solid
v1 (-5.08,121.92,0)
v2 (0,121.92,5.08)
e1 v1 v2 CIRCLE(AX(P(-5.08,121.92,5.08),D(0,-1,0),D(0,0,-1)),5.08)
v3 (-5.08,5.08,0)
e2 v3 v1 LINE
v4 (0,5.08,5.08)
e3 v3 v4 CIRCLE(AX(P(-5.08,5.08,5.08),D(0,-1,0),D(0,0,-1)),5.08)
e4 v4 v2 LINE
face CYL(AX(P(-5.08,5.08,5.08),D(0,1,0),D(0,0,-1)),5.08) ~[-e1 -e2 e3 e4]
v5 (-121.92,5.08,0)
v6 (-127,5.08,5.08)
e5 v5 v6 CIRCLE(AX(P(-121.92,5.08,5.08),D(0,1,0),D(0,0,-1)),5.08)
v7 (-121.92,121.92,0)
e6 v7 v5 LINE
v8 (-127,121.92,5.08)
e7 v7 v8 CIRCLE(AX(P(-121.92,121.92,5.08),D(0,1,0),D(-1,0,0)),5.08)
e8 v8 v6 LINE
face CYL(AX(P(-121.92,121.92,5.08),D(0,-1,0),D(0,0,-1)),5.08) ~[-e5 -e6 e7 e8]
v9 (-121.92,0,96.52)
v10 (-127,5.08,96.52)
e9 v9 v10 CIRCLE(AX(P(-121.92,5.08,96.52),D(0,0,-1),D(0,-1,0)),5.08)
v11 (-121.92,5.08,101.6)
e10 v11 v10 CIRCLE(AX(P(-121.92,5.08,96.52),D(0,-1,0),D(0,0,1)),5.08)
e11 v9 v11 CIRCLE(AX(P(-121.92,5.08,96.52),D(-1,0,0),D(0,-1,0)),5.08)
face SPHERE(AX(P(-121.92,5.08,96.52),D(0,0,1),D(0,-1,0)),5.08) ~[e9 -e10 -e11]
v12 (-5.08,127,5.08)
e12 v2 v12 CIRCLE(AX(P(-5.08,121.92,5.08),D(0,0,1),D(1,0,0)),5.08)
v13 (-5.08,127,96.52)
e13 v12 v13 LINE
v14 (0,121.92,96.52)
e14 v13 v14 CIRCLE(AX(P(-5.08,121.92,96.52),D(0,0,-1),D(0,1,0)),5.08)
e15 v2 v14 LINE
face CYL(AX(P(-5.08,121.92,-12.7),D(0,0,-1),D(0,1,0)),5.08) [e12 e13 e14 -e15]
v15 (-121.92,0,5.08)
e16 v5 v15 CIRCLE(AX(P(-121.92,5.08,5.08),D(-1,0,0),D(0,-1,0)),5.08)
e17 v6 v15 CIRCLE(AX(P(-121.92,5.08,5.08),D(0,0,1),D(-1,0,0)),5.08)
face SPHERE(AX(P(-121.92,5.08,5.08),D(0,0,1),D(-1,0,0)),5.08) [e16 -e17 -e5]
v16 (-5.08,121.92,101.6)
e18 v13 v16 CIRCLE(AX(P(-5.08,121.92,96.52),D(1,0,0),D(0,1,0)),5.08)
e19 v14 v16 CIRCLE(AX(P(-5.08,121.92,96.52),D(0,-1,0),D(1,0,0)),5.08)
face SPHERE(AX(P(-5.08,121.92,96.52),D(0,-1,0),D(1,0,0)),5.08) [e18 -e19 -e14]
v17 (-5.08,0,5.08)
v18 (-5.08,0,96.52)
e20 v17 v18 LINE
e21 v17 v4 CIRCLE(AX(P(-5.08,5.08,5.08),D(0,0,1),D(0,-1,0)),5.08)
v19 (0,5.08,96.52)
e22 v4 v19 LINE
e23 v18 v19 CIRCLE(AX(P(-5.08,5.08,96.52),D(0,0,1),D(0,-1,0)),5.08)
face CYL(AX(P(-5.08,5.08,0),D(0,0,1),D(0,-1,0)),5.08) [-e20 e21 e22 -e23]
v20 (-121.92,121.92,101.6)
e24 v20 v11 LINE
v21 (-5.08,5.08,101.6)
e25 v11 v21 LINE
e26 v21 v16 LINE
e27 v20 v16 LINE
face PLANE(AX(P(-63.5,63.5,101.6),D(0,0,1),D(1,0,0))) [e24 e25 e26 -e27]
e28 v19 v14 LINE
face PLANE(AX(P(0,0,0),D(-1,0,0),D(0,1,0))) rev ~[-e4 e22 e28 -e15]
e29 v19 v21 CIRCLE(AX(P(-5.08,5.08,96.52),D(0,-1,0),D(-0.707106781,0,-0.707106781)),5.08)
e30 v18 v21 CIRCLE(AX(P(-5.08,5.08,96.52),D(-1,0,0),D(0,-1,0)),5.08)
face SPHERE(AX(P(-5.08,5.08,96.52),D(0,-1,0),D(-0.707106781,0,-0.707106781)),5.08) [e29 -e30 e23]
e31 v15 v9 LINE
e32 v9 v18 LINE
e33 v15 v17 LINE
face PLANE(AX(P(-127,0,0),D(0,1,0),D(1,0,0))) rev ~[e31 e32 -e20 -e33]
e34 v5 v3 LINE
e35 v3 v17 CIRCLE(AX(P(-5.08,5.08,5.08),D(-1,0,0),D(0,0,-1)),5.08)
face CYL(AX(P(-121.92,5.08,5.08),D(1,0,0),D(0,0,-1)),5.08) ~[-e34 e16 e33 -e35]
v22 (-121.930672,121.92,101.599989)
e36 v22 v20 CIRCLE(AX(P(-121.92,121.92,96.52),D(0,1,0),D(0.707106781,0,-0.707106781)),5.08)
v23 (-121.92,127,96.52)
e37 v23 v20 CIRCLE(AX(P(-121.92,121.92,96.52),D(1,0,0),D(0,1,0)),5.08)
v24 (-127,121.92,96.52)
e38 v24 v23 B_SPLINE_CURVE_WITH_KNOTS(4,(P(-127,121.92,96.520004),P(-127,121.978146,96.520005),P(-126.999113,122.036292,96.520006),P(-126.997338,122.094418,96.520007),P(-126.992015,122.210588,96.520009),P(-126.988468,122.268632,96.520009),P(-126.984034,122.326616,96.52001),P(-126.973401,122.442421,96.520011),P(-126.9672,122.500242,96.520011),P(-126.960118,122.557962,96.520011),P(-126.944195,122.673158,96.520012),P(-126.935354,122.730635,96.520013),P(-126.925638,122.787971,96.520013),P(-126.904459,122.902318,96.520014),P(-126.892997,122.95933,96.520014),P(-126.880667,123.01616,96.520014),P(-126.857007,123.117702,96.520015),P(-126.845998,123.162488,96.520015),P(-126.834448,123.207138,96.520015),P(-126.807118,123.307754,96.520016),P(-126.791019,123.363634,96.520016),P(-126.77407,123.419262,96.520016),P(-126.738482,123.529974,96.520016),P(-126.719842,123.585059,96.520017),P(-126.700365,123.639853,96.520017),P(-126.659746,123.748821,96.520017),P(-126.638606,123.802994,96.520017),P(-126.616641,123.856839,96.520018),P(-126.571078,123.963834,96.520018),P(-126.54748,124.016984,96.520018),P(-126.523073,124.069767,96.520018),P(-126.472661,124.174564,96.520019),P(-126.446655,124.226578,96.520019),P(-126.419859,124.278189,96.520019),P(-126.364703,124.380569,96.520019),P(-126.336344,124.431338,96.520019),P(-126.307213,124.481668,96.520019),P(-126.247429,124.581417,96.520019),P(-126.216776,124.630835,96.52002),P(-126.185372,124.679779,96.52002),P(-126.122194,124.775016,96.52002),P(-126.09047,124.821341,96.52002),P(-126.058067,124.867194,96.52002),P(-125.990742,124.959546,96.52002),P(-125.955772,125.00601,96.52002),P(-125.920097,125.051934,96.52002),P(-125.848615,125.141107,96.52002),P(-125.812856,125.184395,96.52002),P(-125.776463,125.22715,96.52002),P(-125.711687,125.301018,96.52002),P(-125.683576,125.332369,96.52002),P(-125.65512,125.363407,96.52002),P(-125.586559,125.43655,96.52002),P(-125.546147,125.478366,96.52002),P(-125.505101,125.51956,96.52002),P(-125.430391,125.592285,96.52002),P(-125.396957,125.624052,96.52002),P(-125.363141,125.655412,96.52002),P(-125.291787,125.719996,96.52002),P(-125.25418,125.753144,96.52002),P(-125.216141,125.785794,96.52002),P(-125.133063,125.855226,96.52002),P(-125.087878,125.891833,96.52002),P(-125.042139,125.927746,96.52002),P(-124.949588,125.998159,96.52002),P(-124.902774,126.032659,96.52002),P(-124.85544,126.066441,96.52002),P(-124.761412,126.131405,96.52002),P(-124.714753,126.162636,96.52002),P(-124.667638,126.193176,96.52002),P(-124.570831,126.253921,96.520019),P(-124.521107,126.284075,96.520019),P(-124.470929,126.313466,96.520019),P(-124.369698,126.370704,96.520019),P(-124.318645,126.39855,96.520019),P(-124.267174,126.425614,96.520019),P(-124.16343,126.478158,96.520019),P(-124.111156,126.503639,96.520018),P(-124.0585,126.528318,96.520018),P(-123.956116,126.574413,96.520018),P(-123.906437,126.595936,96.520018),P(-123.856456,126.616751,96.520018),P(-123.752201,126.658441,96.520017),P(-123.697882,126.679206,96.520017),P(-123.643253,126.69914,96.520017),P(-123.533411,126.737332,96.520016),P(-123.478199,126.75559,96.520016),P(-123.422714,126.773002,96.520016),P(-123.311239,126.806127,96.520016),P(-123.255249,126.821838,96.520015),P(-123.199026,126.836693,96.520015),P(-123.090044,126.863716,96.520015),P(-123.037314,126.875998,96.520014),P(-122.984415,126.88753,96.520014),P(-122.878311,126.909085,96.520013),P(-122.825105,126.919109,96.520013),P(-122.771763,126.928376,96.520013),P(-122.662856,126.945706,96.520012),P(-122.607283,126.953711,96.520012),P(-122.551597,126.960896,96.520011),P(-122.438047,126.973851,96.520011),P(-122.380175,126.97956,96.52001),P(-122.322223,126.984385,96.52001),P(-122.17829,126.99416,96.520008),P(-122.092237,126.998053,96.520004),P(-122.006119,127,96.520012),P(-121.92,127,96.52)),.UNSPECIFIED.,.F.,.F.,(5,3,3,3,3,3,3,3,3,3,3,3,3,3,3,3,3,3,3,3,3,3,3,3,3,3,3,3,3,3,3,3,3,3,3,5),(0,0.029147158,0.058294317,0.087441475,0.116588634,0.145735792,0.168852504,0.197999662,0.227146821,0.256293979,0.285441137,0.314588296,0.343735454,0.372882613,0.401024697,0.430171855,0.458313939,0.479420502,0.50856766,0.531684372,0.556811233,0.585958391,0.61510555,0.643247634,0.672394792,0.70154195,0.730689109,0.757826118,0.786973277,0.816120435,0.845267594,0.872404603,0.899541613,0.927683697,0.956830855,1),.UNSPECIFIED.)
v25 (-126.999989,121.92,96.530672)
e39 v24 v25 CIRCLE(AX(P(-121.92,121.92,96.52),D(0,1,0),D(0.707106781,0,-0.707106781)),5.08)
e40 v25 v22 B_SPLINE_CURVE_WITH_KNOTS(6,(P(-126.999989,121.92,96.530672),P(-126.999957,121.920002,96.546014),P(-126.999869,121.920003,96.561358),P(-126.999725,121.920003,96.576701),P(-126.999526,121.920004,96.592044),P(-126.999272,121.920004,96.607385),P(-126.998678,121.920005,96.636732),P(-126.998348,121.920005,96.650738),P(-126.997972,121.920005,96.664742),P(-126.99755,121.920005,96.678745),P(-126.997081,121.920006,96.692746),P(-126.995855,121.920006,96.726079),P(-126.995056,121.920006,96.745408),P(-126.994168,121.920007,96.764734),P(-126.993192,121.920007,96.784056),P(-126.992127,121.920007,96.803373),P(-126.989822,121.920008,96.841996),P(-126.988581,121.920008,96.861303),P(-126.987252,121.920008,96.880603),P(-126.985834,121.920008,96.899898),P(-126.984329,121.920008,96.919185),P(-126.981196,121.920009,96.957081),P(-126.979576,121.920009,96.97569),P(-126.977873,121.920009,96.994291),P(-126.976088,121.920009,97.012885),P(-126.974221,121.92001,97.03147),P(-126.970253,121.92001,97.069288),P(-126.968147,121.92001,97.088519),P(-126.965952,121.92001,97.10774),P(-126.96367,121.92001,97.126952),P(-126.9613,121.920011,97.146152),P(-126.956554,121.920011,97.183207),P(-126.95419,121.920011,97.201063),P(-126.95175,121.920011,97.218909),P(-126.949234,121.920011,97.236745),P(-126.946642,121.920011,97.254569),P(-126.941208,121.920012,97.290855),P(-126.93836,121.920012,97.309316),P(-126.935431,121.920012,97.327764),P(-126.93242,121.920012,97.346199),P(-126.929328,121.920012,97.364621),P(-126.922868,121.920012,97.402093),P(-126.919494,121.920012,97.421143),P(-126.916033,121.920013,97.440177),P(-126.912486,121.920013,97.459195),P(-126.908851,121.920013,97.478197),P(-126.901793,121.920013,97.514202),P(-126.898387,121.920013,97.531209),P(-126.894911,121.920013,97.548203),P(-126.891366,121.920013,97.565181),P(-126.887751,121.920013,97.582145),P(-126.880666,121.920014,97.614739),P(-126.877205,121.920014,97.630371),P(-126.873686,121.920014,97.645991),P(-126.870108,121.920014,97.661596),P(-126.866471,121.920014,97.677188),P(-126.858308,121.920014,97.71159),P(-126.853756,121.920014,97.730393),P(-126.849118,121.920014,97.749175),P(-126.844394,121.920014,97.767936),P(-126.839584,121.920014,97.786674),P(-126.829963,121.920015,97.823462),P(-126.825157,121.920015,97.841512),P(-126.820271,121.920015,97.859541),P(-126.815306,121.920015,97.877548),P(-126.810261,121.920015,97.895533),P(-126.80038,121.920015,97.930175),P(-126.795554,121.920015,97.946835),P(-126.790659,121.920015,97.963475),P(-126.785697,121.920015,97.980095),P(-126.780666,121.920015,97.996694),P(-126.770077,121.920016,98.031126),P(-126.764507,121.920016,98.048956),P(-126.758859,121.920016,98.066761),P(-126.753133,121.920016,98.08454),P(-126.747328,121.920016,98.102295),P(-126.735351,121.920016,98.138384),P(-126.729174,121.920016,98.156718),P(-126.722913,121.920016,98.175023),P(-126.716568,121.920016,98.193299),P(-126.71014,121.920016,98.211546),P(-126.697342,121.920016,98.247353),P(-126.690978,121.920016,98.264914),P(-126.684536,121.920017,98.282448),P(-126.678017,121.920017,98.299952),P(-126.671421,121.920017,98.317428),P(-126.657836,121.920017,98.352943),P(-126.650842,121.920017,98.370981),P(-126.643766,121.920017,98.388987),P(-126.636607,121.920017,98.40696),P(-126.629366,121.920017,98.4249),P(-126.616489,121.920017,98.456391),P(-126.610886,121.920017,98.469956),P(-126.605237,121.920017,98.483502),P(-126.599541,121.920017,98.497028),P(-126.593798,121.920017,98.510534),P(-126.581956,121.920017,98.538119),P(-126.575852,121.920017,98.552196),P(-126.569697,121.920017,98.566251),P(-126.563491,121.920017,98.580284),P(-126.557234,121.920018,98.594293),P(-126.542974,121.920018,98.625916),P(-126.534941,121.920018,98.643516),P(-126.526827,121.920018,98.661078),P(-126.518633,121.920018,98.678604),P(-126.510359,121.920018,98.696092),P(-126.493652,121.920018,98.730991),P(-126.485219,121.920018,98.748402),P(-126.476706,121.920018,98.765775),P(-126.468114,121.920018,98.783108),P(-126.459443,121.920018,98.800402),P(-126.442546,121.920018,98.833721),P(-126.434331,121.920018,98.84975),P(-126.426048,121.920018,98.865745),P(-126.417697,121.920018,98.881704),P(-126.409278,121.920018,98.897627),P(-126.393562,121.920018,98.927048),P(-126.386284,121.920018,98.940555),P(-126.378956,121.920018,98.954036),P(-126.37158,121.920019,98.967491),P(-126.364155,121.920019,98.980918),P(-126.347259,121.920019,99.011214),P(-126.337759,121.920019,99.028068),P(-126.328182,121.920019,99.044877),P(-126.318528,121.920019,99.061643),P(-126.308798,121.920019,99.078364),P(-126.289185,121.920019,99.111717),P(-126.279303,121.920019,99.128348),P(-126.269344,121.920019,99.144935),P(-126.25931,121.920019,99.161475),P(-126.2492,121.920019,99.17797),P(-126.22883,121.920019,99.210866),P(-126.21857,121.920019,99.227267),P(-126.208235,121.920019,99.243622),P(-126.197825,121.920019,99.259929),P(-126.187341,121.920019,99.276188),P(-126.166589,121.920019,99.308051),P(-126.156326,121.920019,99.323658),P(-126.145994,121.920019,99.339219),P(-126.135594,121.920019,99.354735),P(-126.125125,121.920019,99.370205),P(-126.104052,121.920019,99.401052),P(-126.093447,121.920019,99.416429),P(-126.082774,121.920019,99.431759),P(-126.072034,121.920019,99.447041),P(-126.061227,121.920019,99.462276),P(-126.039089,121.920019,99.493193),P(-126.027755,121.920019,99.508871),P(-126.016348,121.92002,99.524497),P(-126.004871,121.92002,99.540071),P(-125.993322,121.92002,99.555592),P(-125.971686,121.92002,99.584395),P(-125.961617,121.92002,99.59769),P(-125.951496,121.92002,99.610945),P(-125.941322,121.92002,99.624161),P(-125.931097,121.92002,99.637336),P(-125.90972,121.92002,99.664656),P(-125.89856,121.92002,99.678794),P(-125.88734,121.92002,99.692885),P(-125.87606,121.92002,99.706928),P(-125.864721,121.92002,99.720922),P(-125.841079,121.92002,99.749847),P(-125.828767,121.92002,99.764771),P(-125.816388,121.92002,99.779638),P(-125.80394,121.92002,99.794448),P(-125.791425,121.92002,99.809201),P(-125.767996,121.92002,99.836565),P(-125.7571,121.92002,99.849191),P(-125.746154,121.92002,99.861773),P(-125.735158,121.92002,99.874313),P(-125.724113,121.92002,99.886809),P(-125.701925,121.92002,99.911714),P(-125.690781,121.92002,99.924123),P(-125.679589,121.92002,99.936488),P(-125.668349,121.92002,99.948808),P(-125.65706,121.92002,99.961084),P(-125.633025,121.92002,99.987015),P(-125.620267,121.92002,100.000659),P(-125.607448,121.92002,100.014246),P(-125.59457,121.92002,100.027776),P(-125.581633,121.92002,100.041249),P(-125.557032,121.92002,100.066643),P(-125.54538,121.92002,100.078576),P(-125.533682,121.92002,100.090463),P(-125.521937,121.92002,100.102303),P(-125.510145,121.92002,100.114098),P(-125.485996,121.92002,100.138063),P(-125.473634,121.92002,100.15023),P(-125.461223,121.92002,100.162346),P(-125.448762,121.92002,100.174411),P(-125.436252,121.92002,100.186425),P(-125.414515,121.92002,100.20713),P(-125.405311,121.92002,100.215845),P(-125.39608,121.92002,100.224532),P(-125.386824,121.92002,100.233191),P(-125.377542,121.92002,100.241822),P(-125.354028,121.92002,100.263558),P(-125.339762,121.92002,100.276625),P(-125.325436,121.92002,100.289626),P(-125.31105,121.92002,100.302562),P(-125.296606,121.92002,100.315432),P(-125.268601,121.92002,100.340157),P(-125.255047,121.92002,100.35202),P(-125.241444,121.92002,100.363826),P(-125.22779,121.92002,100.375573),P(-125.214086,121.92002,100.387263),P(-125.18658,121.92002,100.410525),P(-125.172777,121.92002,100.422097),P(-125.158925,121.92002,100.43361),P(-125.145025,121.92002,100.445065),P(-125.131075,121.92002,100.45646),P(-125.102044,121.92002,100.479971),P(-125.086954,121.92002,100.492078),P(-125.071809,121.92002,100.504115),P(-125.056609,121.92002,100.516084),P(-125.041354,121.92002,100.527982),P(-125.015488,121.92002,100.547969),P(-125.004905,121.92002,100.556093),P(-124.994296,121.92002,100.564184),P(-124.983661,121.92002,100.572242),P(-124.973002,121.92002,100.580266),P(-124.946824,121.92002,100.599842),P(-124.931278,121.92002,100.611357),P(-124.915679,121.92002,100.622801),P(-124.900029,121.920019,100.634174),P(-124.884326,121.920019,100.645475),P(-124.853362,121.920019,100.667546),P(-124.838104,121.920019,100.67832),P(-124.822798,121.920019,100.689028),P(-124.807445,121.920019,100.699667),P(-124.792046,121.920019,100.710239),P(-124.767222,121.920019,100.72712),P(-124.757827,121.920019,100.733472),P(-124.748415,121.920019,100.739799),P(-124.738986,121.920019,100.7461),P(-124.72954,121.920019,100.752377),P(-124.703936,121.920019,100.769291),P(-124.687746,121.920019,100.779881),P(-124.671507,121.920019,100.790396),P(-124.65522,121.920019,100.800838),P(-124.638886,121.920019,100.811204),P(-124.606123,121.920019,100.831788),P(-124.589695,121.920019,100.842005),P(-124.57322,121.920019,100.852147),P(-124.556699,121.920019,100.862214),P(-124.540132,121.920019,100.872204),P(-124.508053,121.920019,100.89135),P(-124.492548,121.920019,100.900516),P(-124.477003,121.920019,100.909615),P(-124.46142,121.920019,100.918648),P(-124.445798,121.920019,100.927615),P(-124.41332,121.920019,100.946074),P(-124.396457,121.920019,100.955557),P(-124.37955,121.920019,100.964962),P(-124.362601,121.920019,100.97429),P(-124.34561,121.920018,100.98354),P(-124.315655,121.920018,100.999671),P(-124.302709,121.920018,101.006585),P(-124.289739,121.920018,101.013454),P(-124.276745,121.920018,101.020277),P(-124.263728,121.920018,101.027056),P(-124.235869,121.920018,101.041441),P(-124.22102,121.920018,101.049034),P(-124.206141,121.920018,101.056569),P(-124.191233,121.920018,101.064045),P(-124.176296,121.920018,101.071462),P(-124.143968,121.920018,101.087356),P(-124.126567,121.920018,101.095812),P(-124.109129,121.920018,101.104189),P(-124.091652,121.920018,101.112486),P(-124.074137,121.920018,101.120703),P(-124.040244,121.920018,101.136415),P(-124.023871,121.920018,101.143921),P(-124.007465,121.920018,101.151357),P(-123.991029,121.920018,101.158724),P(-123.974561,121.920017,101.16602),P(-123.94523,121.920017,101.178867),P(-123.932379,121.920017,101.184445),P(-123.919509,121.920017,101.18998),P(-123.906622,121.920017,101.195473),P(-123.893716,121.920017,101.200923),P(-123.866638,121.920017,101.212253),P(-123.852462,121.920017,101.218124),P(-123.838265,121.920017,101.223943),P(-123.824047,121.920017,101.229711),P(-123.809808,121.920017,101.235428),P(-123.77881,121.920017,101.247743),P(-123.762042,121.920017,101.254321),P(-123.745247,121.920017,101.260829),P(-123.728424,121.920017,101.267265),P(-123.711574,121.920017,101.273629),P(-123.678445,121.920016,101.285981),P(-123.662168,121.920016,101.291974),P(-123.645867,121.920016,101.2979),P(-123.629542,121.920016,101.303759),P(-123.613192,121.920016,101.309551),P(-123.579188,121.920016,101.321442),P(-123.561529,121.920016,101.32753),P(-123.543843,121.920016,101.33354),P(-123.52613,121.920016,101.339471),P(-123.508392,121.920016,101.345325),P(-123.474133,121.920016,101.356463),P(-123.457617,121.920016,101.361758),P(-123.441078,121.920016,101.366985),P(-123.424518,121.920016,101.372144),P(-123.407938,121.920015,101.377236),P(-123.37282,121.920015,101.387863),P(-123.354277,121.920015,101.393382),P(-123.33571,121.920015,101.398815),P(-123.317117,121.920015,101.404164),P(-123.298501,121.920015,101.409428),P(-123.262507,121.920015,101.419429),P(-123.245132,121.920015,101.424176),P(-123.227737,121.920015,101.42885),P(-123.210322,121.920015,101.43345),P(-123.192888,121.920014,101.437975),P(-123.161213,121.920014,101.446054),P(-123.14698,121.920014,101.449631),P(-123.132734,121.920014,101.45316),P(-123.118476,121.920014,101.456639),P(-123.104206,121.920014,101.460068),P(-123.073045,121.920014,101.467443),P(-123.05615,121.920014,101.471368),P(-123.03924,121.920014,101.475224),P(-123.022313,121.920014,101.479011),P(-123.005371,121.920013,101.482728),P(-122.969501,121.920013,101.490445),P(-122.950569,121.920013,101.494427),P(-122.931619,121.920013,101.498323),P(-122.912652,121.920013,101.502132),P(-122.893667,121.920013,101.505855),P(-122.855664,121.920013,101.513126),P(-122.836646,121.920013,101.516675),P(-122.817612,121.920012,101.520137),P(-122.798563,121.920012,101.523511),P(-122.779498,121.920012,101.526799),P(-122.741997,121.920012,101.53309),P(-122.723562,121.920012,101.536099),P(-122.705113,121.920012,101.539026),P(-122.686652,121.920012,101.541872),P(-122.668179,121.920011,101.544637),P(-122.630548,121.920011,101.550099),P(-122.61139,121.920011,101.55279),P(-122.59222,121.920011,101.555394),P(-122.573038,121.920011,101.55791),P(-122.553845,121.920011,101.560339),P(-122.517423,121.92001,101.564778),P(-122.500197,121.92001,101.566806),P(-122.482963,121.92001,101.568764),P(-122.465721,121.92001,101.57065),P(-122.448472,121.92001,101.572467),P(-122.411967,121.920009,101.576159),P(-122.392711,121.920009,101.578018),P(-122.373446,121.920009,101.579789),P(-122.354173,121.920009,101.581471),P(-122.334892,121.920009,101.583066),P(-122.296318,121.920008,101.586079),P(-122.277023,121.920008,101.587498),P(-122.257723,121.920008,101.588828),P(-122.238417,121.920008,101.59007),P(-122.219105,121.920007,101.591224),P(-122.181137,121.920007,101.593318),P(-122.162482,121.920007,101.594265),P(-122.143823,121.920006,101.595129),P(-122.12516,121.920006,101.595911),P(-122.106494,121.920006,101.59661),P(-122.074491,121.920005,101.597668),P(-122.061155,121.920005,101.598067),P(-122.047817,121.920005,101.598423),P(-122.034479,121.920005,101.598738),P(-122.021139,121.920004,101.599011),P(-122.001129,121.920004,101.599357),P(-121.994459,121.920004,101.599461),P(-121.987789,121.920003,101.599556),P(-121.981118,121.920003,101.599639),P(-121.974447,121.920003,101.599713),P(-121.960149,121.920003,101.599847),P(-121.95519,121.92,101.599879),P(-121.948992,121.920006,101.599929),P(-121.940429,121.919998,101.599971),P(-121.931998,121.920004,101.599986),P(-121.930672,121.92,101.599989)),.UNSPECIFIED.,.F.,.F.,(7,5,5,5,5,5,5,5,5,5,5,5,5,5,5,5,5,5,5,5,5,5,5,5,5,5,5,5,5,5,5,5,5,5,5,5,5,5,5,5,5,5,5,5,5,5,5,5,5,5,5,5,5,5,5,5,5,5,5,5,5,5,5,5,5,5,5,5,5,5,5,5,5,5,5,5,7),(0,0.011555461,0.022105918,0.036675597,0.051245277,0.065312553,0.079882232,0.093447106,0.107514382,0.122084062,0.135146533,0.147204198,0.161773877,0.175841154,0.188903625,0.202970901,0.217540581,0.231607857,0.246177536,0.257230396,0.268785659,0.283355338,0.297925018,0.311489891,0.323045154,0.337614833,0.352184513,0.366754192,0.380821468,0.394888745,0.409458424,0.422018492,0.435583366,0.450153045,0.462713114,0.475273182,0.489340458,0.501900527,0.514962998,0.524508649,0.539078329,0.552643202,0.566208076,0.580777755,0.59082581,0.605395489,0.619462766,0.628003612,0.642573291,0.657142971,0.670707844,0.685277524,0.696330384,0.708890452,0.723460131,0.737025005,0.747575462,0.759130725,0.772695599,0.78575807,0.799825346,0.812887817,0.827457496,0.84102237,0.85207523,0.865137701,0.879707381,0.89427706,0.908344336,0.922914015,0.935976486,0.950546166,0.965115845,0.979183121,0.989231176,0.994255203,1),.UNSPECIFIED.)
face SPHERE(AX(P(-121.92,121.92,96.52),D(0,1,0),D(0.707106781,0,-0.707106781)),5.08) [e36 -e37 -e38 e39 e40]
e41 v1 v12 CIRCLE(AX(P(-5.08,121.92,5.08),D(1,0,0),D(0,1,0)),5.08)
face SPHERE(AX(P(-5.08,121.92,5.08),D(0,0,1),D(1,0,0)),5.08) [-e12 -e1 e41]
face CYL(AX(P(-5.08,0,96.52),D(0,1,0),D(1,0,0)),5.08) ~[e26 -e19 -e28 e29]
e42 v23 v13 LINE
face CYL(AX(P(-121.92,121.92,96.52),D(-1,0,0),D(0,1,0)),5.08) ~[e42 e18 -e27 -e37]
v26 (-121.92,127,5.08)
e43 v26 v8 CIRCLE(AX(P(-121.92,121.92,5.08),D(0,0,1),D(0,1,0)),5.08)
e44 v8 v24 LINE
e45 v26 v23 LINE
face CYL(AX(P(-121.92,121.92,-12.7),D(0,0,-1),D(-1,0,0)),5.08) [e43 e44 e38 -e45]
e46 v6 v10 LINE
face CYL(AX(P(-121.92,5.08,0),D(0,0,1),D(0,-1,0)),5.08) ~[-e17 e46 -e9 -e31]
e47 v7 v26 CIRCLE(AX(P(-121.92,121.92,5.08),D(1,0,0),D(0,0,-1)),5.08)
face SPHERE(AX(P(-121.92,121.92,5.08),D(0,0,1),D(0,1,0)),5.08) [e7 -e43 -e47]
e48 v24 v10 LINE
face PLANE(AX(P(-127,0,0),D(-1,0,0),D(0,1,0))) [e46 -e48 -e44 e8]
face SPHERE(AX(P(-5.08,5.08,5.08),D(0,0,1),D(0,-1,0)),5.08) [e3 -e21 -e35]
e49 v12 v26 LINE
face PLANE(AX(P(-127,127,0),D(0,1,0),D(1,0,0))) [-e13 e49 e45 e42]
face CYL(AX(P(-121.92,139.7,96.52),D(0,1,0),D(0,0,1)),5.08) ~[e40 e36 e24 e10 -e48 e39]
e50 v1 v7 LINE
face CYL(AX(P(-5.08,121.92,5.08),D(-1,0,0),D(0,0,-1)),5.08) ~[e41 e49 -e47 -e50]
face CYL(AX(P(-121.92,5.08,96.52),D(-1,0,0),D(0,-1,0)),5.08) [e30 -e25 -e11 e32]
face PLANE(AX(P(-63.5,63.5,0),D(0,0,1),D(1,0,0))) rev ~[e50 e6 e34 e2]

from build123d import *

# Parameters (mm, degrees)
F0_W         = 127
F0_H         = 127
F1_DEPTH     = 101.6
F2_R         = 5.08
F3_R         = 5.08
F4_T1_DEPTH  = 134.62
F4_T3_DEPTH  = 127
F4_T5_DEPTH  = 116.84
F4_S9_W      = 5.08
F4_S9_H      = 5.08
F4_T10_DEPTH = 5.08
F4_T14_ANGLE = 90
F5_T1_DEPTH  = 116.84
F5_T3_DEPTH  = 109.22
F5_S7_W      = 5.08
F5_S7_H      = 5.08
F5_T8_DEPTH  = 5.08
F5_T12_ANGLE = 90
F6_R         = 5.08


# Not quite as in the source:
# - a fillet or chamfer that OpenCascade refuses, or shapes differently, is made with other operations: its cross-section is extruded or revolved along the edge and cut away or added


with BuildPart() as f1:
    # F0 (on Top) → F1 (new body)
    with BuildSketch(Plane.XY):
        with Locations((-63.5, 63.5)):
            Rectangle(F0_W, F0_H)
    extrude(amount=F1_DEPTH)

    # F2
    f2_edges = [f1.edges().sort_by_distance(p)[0] for p in [
        (0, 63.5, 101.6),
        (0, 0, 50.8),
    ]]
    fillet(f2_edges, radius=F2_R)

    # F3
    f3_edges = [f1.edges().sort_by_distance(p)[0] for p in [
        (-127, 0, 50.8),
    ]]
    fillet(f3_edges, radius=F3_R)

    # F4: fillet of radius 5.08 on 2 edges, made by hand

    # F4_s2 → F4_t1 (cut)
    with BuildSketch(Plane.XZ.offset(-139.7)):
        with BuildLine():
            ThreePointArc((-121.92, 101.6), (-125.5121024484, 100.1121024484), (-127, 96.52))
            Line((-127, 96.52), (-127, 101.6))
            Line((-127, 101.6), (-121.92, 101.6))
        make_face()
    extrude(amount=F4_T1_DEPTH, mode=Mode.SUBTRACT)

    # F4_s4 → F4_t3 (cut)
    with BuildSketch(Plane.XY.offset(-12.7)):
        with BuildLine():
            ThreePointArc((-127, 121.92), (-125.5121024484, 125.5121024484), (-121.92, 127))
            Line((-121.92, 127), (-127, 127))
            Line((-127, 127), (-127, 121.92))
        make_face()
    extrude(amount=F4_T3_DEPTH, mode=Mode.SUBTRACT)

    # F4_s6 → F4_t5 (cut)
    with BuildSketch(Plane.YZ.offset(-121.92)):
        with BuildLine():
            ThreePointArc((0, 96.52), (1.4878975516, 100.1121024484), (5.08, 101.6))
            Line((5.08, 101.6), (0, 101.6))
            Line((0, 101.6), (0, 96.52))
        make_face()
    extrude(amount=F4_T5_DEPTH, mode=Mode.SUBTRACT)


with BuildPart() as f4_tool8:
    # F4_s9 → F4_t10 (new body)
    with BuildSketch(Plane.XZ.offset(-5.08)):
        with Locations((-2.54, 99.06)):
            Rectangle(F4_S9_W, F4_S9_H)
    extrude(amount=F4_T10_DEPTH)

    # F4_s11 → F4_t12 (revolve, cut)
    with BuildSketch(Plane(origin=(-5.08, 5.08, 96.52), x_dir=(-0.7071067812, 0, -0.7071067812), z_dir=(-0.7071067812, 0, 0.7071067812))):
        with BuildLine():
            ThreePointArc((0, -5.08), (5.08, 0), (0, 5.08))
            Line((0, 5.08), (0, -5.08))
        make_face()
    revolve(axis=Axis((-5.08, 5.08, 96.52), (0, -1, 0)), mode=Mode.SUBTRACT)


with BuildPart() as f1_1:
    add(f1.part)

    # F4_t7: cut F4_tool8
    add(f4_tool8.part, mode=Mode.SUBTRACT)

    # F4_s13 → F4_t14 (revolve, cut)
    with BuildSketch(Plane.YZ.offset(-121.92)):
        with BuildLine():
            ThreePointArc((0, 96.52), (1.4878975516, 100.1121024484), (5.08, 101.6))
            Line((5.08, 101.6), (0, 101.6))
            Line((0, 101.6), (0, 96.52))
        make_face()
    revolve(axis=Axis((-121.92, 5.08, 101.6), (0, 0, -1)), revolution_arc=F4_T14_ANGLE, mode=Mode.SUBTRACT)

    # F5: fillet of radius 5.08 on 2 edges, made by hand

    # F5_s2 → F5_t1 (cut)
    with BuildSketch(Plane.YZ.offset(-121.92)):
        with BuildLine():
            ThreePointArc((127, 96.52), (125.5121024484, 100.1121024484), (121.92, 101.6))
            Line((121.92, 101.6), (127, 101.6))
            Line((127, 101.6), (127, 96.52))
        make_face()
    extrude(amount=F5_T1_DEPTH, mode=Mode.SUBTRACT)

    # F5_s4 → F5_t3 (cut)
    with BuildSketch(Plane.XY.offset(-12.7)):
        with BuildLine():
            ThreePointArc((-5.08, 127), (-1.4878975516, 125.5121024484), (0, 121.92))
            Line((0, 121.92), (0, 127))
            Line((0, 127), (-5.08, 127))
        make_face()
    extrude(amount=F5_T3_DEPTH, mode=Mode.SUBTRACT)


with BuildPart() as f5_tool6:
    # F5_s7 → F5_t8 (new body)
    with BuildSketch(Plane.XZ.offset(-121.92)):
        with Locations((-124.46, 99.06)):
            Rectangle(F5_S7_W, F5_S7_H)
    extrude(amount=-F5_T8_DEPTH)

    # F5_s9 → F5_t10 (revolve, cut)
    with BuildSketch(Plane(origin=(-121.92, 121.92, 96.52), x_dir=(0.7071067812, 0, -0.7071067812), z_dir=(0.7071067812, 0, 0.7071067812))):
        with BuildLine():
            ThreePointArc((0, -5.08), (5.08, 0), (0, 5.08))
            Line((0, 5.08), (0, -5.08))
        make_face()
    revolve(axis=Axis((-121.92, 121.92, 96.52), (0, 1, 0)), mode=Mode.SUBTRACT)


with BuildPart() as f1_2:
    add(f1_1.part)

    # F5_t5: cut F5_tool6
    add(f5_tool6.part, mode=Mode.SUBTRACT)

    # F5_s11 → F5_t12 (revolve, cut)
    with BuildSketch(Plane.XY.offset(96.52)):
        with BuildLine():
            ThreePointArc((-5.08, 127), (-1.4878975516, 125.5121024484), (0, 121.92))
            Line((0, 121.92), (0, 127))
            Line((0, 127), (-5.08, 127))
        make_face()
    revolve(axis=Axis((-5.08, 127, 96.52), (0, -1, 0)), revolution_arc=F5_T12_ANGLE, mode=Mode.SUBTRACT)

    # F6
    f6_edges = [f1_2.edges().sort_by_distance(p)[0] for p in [
        (0, 63.5, 0),
        (-125.512102, 1.487898, 0),
        (-127, 63.5, 0),
        (-125.512102, 125.512102, 0),
        (-63.5, 127, 0),
        (-1.487898, 125.512102, 0),
        (-1.487898, 1.487898, 0),
        (-63.5, 0, 0),
    ]]
    fillet(f6_edges, radius=F6_R)


solid = f1_2.part
